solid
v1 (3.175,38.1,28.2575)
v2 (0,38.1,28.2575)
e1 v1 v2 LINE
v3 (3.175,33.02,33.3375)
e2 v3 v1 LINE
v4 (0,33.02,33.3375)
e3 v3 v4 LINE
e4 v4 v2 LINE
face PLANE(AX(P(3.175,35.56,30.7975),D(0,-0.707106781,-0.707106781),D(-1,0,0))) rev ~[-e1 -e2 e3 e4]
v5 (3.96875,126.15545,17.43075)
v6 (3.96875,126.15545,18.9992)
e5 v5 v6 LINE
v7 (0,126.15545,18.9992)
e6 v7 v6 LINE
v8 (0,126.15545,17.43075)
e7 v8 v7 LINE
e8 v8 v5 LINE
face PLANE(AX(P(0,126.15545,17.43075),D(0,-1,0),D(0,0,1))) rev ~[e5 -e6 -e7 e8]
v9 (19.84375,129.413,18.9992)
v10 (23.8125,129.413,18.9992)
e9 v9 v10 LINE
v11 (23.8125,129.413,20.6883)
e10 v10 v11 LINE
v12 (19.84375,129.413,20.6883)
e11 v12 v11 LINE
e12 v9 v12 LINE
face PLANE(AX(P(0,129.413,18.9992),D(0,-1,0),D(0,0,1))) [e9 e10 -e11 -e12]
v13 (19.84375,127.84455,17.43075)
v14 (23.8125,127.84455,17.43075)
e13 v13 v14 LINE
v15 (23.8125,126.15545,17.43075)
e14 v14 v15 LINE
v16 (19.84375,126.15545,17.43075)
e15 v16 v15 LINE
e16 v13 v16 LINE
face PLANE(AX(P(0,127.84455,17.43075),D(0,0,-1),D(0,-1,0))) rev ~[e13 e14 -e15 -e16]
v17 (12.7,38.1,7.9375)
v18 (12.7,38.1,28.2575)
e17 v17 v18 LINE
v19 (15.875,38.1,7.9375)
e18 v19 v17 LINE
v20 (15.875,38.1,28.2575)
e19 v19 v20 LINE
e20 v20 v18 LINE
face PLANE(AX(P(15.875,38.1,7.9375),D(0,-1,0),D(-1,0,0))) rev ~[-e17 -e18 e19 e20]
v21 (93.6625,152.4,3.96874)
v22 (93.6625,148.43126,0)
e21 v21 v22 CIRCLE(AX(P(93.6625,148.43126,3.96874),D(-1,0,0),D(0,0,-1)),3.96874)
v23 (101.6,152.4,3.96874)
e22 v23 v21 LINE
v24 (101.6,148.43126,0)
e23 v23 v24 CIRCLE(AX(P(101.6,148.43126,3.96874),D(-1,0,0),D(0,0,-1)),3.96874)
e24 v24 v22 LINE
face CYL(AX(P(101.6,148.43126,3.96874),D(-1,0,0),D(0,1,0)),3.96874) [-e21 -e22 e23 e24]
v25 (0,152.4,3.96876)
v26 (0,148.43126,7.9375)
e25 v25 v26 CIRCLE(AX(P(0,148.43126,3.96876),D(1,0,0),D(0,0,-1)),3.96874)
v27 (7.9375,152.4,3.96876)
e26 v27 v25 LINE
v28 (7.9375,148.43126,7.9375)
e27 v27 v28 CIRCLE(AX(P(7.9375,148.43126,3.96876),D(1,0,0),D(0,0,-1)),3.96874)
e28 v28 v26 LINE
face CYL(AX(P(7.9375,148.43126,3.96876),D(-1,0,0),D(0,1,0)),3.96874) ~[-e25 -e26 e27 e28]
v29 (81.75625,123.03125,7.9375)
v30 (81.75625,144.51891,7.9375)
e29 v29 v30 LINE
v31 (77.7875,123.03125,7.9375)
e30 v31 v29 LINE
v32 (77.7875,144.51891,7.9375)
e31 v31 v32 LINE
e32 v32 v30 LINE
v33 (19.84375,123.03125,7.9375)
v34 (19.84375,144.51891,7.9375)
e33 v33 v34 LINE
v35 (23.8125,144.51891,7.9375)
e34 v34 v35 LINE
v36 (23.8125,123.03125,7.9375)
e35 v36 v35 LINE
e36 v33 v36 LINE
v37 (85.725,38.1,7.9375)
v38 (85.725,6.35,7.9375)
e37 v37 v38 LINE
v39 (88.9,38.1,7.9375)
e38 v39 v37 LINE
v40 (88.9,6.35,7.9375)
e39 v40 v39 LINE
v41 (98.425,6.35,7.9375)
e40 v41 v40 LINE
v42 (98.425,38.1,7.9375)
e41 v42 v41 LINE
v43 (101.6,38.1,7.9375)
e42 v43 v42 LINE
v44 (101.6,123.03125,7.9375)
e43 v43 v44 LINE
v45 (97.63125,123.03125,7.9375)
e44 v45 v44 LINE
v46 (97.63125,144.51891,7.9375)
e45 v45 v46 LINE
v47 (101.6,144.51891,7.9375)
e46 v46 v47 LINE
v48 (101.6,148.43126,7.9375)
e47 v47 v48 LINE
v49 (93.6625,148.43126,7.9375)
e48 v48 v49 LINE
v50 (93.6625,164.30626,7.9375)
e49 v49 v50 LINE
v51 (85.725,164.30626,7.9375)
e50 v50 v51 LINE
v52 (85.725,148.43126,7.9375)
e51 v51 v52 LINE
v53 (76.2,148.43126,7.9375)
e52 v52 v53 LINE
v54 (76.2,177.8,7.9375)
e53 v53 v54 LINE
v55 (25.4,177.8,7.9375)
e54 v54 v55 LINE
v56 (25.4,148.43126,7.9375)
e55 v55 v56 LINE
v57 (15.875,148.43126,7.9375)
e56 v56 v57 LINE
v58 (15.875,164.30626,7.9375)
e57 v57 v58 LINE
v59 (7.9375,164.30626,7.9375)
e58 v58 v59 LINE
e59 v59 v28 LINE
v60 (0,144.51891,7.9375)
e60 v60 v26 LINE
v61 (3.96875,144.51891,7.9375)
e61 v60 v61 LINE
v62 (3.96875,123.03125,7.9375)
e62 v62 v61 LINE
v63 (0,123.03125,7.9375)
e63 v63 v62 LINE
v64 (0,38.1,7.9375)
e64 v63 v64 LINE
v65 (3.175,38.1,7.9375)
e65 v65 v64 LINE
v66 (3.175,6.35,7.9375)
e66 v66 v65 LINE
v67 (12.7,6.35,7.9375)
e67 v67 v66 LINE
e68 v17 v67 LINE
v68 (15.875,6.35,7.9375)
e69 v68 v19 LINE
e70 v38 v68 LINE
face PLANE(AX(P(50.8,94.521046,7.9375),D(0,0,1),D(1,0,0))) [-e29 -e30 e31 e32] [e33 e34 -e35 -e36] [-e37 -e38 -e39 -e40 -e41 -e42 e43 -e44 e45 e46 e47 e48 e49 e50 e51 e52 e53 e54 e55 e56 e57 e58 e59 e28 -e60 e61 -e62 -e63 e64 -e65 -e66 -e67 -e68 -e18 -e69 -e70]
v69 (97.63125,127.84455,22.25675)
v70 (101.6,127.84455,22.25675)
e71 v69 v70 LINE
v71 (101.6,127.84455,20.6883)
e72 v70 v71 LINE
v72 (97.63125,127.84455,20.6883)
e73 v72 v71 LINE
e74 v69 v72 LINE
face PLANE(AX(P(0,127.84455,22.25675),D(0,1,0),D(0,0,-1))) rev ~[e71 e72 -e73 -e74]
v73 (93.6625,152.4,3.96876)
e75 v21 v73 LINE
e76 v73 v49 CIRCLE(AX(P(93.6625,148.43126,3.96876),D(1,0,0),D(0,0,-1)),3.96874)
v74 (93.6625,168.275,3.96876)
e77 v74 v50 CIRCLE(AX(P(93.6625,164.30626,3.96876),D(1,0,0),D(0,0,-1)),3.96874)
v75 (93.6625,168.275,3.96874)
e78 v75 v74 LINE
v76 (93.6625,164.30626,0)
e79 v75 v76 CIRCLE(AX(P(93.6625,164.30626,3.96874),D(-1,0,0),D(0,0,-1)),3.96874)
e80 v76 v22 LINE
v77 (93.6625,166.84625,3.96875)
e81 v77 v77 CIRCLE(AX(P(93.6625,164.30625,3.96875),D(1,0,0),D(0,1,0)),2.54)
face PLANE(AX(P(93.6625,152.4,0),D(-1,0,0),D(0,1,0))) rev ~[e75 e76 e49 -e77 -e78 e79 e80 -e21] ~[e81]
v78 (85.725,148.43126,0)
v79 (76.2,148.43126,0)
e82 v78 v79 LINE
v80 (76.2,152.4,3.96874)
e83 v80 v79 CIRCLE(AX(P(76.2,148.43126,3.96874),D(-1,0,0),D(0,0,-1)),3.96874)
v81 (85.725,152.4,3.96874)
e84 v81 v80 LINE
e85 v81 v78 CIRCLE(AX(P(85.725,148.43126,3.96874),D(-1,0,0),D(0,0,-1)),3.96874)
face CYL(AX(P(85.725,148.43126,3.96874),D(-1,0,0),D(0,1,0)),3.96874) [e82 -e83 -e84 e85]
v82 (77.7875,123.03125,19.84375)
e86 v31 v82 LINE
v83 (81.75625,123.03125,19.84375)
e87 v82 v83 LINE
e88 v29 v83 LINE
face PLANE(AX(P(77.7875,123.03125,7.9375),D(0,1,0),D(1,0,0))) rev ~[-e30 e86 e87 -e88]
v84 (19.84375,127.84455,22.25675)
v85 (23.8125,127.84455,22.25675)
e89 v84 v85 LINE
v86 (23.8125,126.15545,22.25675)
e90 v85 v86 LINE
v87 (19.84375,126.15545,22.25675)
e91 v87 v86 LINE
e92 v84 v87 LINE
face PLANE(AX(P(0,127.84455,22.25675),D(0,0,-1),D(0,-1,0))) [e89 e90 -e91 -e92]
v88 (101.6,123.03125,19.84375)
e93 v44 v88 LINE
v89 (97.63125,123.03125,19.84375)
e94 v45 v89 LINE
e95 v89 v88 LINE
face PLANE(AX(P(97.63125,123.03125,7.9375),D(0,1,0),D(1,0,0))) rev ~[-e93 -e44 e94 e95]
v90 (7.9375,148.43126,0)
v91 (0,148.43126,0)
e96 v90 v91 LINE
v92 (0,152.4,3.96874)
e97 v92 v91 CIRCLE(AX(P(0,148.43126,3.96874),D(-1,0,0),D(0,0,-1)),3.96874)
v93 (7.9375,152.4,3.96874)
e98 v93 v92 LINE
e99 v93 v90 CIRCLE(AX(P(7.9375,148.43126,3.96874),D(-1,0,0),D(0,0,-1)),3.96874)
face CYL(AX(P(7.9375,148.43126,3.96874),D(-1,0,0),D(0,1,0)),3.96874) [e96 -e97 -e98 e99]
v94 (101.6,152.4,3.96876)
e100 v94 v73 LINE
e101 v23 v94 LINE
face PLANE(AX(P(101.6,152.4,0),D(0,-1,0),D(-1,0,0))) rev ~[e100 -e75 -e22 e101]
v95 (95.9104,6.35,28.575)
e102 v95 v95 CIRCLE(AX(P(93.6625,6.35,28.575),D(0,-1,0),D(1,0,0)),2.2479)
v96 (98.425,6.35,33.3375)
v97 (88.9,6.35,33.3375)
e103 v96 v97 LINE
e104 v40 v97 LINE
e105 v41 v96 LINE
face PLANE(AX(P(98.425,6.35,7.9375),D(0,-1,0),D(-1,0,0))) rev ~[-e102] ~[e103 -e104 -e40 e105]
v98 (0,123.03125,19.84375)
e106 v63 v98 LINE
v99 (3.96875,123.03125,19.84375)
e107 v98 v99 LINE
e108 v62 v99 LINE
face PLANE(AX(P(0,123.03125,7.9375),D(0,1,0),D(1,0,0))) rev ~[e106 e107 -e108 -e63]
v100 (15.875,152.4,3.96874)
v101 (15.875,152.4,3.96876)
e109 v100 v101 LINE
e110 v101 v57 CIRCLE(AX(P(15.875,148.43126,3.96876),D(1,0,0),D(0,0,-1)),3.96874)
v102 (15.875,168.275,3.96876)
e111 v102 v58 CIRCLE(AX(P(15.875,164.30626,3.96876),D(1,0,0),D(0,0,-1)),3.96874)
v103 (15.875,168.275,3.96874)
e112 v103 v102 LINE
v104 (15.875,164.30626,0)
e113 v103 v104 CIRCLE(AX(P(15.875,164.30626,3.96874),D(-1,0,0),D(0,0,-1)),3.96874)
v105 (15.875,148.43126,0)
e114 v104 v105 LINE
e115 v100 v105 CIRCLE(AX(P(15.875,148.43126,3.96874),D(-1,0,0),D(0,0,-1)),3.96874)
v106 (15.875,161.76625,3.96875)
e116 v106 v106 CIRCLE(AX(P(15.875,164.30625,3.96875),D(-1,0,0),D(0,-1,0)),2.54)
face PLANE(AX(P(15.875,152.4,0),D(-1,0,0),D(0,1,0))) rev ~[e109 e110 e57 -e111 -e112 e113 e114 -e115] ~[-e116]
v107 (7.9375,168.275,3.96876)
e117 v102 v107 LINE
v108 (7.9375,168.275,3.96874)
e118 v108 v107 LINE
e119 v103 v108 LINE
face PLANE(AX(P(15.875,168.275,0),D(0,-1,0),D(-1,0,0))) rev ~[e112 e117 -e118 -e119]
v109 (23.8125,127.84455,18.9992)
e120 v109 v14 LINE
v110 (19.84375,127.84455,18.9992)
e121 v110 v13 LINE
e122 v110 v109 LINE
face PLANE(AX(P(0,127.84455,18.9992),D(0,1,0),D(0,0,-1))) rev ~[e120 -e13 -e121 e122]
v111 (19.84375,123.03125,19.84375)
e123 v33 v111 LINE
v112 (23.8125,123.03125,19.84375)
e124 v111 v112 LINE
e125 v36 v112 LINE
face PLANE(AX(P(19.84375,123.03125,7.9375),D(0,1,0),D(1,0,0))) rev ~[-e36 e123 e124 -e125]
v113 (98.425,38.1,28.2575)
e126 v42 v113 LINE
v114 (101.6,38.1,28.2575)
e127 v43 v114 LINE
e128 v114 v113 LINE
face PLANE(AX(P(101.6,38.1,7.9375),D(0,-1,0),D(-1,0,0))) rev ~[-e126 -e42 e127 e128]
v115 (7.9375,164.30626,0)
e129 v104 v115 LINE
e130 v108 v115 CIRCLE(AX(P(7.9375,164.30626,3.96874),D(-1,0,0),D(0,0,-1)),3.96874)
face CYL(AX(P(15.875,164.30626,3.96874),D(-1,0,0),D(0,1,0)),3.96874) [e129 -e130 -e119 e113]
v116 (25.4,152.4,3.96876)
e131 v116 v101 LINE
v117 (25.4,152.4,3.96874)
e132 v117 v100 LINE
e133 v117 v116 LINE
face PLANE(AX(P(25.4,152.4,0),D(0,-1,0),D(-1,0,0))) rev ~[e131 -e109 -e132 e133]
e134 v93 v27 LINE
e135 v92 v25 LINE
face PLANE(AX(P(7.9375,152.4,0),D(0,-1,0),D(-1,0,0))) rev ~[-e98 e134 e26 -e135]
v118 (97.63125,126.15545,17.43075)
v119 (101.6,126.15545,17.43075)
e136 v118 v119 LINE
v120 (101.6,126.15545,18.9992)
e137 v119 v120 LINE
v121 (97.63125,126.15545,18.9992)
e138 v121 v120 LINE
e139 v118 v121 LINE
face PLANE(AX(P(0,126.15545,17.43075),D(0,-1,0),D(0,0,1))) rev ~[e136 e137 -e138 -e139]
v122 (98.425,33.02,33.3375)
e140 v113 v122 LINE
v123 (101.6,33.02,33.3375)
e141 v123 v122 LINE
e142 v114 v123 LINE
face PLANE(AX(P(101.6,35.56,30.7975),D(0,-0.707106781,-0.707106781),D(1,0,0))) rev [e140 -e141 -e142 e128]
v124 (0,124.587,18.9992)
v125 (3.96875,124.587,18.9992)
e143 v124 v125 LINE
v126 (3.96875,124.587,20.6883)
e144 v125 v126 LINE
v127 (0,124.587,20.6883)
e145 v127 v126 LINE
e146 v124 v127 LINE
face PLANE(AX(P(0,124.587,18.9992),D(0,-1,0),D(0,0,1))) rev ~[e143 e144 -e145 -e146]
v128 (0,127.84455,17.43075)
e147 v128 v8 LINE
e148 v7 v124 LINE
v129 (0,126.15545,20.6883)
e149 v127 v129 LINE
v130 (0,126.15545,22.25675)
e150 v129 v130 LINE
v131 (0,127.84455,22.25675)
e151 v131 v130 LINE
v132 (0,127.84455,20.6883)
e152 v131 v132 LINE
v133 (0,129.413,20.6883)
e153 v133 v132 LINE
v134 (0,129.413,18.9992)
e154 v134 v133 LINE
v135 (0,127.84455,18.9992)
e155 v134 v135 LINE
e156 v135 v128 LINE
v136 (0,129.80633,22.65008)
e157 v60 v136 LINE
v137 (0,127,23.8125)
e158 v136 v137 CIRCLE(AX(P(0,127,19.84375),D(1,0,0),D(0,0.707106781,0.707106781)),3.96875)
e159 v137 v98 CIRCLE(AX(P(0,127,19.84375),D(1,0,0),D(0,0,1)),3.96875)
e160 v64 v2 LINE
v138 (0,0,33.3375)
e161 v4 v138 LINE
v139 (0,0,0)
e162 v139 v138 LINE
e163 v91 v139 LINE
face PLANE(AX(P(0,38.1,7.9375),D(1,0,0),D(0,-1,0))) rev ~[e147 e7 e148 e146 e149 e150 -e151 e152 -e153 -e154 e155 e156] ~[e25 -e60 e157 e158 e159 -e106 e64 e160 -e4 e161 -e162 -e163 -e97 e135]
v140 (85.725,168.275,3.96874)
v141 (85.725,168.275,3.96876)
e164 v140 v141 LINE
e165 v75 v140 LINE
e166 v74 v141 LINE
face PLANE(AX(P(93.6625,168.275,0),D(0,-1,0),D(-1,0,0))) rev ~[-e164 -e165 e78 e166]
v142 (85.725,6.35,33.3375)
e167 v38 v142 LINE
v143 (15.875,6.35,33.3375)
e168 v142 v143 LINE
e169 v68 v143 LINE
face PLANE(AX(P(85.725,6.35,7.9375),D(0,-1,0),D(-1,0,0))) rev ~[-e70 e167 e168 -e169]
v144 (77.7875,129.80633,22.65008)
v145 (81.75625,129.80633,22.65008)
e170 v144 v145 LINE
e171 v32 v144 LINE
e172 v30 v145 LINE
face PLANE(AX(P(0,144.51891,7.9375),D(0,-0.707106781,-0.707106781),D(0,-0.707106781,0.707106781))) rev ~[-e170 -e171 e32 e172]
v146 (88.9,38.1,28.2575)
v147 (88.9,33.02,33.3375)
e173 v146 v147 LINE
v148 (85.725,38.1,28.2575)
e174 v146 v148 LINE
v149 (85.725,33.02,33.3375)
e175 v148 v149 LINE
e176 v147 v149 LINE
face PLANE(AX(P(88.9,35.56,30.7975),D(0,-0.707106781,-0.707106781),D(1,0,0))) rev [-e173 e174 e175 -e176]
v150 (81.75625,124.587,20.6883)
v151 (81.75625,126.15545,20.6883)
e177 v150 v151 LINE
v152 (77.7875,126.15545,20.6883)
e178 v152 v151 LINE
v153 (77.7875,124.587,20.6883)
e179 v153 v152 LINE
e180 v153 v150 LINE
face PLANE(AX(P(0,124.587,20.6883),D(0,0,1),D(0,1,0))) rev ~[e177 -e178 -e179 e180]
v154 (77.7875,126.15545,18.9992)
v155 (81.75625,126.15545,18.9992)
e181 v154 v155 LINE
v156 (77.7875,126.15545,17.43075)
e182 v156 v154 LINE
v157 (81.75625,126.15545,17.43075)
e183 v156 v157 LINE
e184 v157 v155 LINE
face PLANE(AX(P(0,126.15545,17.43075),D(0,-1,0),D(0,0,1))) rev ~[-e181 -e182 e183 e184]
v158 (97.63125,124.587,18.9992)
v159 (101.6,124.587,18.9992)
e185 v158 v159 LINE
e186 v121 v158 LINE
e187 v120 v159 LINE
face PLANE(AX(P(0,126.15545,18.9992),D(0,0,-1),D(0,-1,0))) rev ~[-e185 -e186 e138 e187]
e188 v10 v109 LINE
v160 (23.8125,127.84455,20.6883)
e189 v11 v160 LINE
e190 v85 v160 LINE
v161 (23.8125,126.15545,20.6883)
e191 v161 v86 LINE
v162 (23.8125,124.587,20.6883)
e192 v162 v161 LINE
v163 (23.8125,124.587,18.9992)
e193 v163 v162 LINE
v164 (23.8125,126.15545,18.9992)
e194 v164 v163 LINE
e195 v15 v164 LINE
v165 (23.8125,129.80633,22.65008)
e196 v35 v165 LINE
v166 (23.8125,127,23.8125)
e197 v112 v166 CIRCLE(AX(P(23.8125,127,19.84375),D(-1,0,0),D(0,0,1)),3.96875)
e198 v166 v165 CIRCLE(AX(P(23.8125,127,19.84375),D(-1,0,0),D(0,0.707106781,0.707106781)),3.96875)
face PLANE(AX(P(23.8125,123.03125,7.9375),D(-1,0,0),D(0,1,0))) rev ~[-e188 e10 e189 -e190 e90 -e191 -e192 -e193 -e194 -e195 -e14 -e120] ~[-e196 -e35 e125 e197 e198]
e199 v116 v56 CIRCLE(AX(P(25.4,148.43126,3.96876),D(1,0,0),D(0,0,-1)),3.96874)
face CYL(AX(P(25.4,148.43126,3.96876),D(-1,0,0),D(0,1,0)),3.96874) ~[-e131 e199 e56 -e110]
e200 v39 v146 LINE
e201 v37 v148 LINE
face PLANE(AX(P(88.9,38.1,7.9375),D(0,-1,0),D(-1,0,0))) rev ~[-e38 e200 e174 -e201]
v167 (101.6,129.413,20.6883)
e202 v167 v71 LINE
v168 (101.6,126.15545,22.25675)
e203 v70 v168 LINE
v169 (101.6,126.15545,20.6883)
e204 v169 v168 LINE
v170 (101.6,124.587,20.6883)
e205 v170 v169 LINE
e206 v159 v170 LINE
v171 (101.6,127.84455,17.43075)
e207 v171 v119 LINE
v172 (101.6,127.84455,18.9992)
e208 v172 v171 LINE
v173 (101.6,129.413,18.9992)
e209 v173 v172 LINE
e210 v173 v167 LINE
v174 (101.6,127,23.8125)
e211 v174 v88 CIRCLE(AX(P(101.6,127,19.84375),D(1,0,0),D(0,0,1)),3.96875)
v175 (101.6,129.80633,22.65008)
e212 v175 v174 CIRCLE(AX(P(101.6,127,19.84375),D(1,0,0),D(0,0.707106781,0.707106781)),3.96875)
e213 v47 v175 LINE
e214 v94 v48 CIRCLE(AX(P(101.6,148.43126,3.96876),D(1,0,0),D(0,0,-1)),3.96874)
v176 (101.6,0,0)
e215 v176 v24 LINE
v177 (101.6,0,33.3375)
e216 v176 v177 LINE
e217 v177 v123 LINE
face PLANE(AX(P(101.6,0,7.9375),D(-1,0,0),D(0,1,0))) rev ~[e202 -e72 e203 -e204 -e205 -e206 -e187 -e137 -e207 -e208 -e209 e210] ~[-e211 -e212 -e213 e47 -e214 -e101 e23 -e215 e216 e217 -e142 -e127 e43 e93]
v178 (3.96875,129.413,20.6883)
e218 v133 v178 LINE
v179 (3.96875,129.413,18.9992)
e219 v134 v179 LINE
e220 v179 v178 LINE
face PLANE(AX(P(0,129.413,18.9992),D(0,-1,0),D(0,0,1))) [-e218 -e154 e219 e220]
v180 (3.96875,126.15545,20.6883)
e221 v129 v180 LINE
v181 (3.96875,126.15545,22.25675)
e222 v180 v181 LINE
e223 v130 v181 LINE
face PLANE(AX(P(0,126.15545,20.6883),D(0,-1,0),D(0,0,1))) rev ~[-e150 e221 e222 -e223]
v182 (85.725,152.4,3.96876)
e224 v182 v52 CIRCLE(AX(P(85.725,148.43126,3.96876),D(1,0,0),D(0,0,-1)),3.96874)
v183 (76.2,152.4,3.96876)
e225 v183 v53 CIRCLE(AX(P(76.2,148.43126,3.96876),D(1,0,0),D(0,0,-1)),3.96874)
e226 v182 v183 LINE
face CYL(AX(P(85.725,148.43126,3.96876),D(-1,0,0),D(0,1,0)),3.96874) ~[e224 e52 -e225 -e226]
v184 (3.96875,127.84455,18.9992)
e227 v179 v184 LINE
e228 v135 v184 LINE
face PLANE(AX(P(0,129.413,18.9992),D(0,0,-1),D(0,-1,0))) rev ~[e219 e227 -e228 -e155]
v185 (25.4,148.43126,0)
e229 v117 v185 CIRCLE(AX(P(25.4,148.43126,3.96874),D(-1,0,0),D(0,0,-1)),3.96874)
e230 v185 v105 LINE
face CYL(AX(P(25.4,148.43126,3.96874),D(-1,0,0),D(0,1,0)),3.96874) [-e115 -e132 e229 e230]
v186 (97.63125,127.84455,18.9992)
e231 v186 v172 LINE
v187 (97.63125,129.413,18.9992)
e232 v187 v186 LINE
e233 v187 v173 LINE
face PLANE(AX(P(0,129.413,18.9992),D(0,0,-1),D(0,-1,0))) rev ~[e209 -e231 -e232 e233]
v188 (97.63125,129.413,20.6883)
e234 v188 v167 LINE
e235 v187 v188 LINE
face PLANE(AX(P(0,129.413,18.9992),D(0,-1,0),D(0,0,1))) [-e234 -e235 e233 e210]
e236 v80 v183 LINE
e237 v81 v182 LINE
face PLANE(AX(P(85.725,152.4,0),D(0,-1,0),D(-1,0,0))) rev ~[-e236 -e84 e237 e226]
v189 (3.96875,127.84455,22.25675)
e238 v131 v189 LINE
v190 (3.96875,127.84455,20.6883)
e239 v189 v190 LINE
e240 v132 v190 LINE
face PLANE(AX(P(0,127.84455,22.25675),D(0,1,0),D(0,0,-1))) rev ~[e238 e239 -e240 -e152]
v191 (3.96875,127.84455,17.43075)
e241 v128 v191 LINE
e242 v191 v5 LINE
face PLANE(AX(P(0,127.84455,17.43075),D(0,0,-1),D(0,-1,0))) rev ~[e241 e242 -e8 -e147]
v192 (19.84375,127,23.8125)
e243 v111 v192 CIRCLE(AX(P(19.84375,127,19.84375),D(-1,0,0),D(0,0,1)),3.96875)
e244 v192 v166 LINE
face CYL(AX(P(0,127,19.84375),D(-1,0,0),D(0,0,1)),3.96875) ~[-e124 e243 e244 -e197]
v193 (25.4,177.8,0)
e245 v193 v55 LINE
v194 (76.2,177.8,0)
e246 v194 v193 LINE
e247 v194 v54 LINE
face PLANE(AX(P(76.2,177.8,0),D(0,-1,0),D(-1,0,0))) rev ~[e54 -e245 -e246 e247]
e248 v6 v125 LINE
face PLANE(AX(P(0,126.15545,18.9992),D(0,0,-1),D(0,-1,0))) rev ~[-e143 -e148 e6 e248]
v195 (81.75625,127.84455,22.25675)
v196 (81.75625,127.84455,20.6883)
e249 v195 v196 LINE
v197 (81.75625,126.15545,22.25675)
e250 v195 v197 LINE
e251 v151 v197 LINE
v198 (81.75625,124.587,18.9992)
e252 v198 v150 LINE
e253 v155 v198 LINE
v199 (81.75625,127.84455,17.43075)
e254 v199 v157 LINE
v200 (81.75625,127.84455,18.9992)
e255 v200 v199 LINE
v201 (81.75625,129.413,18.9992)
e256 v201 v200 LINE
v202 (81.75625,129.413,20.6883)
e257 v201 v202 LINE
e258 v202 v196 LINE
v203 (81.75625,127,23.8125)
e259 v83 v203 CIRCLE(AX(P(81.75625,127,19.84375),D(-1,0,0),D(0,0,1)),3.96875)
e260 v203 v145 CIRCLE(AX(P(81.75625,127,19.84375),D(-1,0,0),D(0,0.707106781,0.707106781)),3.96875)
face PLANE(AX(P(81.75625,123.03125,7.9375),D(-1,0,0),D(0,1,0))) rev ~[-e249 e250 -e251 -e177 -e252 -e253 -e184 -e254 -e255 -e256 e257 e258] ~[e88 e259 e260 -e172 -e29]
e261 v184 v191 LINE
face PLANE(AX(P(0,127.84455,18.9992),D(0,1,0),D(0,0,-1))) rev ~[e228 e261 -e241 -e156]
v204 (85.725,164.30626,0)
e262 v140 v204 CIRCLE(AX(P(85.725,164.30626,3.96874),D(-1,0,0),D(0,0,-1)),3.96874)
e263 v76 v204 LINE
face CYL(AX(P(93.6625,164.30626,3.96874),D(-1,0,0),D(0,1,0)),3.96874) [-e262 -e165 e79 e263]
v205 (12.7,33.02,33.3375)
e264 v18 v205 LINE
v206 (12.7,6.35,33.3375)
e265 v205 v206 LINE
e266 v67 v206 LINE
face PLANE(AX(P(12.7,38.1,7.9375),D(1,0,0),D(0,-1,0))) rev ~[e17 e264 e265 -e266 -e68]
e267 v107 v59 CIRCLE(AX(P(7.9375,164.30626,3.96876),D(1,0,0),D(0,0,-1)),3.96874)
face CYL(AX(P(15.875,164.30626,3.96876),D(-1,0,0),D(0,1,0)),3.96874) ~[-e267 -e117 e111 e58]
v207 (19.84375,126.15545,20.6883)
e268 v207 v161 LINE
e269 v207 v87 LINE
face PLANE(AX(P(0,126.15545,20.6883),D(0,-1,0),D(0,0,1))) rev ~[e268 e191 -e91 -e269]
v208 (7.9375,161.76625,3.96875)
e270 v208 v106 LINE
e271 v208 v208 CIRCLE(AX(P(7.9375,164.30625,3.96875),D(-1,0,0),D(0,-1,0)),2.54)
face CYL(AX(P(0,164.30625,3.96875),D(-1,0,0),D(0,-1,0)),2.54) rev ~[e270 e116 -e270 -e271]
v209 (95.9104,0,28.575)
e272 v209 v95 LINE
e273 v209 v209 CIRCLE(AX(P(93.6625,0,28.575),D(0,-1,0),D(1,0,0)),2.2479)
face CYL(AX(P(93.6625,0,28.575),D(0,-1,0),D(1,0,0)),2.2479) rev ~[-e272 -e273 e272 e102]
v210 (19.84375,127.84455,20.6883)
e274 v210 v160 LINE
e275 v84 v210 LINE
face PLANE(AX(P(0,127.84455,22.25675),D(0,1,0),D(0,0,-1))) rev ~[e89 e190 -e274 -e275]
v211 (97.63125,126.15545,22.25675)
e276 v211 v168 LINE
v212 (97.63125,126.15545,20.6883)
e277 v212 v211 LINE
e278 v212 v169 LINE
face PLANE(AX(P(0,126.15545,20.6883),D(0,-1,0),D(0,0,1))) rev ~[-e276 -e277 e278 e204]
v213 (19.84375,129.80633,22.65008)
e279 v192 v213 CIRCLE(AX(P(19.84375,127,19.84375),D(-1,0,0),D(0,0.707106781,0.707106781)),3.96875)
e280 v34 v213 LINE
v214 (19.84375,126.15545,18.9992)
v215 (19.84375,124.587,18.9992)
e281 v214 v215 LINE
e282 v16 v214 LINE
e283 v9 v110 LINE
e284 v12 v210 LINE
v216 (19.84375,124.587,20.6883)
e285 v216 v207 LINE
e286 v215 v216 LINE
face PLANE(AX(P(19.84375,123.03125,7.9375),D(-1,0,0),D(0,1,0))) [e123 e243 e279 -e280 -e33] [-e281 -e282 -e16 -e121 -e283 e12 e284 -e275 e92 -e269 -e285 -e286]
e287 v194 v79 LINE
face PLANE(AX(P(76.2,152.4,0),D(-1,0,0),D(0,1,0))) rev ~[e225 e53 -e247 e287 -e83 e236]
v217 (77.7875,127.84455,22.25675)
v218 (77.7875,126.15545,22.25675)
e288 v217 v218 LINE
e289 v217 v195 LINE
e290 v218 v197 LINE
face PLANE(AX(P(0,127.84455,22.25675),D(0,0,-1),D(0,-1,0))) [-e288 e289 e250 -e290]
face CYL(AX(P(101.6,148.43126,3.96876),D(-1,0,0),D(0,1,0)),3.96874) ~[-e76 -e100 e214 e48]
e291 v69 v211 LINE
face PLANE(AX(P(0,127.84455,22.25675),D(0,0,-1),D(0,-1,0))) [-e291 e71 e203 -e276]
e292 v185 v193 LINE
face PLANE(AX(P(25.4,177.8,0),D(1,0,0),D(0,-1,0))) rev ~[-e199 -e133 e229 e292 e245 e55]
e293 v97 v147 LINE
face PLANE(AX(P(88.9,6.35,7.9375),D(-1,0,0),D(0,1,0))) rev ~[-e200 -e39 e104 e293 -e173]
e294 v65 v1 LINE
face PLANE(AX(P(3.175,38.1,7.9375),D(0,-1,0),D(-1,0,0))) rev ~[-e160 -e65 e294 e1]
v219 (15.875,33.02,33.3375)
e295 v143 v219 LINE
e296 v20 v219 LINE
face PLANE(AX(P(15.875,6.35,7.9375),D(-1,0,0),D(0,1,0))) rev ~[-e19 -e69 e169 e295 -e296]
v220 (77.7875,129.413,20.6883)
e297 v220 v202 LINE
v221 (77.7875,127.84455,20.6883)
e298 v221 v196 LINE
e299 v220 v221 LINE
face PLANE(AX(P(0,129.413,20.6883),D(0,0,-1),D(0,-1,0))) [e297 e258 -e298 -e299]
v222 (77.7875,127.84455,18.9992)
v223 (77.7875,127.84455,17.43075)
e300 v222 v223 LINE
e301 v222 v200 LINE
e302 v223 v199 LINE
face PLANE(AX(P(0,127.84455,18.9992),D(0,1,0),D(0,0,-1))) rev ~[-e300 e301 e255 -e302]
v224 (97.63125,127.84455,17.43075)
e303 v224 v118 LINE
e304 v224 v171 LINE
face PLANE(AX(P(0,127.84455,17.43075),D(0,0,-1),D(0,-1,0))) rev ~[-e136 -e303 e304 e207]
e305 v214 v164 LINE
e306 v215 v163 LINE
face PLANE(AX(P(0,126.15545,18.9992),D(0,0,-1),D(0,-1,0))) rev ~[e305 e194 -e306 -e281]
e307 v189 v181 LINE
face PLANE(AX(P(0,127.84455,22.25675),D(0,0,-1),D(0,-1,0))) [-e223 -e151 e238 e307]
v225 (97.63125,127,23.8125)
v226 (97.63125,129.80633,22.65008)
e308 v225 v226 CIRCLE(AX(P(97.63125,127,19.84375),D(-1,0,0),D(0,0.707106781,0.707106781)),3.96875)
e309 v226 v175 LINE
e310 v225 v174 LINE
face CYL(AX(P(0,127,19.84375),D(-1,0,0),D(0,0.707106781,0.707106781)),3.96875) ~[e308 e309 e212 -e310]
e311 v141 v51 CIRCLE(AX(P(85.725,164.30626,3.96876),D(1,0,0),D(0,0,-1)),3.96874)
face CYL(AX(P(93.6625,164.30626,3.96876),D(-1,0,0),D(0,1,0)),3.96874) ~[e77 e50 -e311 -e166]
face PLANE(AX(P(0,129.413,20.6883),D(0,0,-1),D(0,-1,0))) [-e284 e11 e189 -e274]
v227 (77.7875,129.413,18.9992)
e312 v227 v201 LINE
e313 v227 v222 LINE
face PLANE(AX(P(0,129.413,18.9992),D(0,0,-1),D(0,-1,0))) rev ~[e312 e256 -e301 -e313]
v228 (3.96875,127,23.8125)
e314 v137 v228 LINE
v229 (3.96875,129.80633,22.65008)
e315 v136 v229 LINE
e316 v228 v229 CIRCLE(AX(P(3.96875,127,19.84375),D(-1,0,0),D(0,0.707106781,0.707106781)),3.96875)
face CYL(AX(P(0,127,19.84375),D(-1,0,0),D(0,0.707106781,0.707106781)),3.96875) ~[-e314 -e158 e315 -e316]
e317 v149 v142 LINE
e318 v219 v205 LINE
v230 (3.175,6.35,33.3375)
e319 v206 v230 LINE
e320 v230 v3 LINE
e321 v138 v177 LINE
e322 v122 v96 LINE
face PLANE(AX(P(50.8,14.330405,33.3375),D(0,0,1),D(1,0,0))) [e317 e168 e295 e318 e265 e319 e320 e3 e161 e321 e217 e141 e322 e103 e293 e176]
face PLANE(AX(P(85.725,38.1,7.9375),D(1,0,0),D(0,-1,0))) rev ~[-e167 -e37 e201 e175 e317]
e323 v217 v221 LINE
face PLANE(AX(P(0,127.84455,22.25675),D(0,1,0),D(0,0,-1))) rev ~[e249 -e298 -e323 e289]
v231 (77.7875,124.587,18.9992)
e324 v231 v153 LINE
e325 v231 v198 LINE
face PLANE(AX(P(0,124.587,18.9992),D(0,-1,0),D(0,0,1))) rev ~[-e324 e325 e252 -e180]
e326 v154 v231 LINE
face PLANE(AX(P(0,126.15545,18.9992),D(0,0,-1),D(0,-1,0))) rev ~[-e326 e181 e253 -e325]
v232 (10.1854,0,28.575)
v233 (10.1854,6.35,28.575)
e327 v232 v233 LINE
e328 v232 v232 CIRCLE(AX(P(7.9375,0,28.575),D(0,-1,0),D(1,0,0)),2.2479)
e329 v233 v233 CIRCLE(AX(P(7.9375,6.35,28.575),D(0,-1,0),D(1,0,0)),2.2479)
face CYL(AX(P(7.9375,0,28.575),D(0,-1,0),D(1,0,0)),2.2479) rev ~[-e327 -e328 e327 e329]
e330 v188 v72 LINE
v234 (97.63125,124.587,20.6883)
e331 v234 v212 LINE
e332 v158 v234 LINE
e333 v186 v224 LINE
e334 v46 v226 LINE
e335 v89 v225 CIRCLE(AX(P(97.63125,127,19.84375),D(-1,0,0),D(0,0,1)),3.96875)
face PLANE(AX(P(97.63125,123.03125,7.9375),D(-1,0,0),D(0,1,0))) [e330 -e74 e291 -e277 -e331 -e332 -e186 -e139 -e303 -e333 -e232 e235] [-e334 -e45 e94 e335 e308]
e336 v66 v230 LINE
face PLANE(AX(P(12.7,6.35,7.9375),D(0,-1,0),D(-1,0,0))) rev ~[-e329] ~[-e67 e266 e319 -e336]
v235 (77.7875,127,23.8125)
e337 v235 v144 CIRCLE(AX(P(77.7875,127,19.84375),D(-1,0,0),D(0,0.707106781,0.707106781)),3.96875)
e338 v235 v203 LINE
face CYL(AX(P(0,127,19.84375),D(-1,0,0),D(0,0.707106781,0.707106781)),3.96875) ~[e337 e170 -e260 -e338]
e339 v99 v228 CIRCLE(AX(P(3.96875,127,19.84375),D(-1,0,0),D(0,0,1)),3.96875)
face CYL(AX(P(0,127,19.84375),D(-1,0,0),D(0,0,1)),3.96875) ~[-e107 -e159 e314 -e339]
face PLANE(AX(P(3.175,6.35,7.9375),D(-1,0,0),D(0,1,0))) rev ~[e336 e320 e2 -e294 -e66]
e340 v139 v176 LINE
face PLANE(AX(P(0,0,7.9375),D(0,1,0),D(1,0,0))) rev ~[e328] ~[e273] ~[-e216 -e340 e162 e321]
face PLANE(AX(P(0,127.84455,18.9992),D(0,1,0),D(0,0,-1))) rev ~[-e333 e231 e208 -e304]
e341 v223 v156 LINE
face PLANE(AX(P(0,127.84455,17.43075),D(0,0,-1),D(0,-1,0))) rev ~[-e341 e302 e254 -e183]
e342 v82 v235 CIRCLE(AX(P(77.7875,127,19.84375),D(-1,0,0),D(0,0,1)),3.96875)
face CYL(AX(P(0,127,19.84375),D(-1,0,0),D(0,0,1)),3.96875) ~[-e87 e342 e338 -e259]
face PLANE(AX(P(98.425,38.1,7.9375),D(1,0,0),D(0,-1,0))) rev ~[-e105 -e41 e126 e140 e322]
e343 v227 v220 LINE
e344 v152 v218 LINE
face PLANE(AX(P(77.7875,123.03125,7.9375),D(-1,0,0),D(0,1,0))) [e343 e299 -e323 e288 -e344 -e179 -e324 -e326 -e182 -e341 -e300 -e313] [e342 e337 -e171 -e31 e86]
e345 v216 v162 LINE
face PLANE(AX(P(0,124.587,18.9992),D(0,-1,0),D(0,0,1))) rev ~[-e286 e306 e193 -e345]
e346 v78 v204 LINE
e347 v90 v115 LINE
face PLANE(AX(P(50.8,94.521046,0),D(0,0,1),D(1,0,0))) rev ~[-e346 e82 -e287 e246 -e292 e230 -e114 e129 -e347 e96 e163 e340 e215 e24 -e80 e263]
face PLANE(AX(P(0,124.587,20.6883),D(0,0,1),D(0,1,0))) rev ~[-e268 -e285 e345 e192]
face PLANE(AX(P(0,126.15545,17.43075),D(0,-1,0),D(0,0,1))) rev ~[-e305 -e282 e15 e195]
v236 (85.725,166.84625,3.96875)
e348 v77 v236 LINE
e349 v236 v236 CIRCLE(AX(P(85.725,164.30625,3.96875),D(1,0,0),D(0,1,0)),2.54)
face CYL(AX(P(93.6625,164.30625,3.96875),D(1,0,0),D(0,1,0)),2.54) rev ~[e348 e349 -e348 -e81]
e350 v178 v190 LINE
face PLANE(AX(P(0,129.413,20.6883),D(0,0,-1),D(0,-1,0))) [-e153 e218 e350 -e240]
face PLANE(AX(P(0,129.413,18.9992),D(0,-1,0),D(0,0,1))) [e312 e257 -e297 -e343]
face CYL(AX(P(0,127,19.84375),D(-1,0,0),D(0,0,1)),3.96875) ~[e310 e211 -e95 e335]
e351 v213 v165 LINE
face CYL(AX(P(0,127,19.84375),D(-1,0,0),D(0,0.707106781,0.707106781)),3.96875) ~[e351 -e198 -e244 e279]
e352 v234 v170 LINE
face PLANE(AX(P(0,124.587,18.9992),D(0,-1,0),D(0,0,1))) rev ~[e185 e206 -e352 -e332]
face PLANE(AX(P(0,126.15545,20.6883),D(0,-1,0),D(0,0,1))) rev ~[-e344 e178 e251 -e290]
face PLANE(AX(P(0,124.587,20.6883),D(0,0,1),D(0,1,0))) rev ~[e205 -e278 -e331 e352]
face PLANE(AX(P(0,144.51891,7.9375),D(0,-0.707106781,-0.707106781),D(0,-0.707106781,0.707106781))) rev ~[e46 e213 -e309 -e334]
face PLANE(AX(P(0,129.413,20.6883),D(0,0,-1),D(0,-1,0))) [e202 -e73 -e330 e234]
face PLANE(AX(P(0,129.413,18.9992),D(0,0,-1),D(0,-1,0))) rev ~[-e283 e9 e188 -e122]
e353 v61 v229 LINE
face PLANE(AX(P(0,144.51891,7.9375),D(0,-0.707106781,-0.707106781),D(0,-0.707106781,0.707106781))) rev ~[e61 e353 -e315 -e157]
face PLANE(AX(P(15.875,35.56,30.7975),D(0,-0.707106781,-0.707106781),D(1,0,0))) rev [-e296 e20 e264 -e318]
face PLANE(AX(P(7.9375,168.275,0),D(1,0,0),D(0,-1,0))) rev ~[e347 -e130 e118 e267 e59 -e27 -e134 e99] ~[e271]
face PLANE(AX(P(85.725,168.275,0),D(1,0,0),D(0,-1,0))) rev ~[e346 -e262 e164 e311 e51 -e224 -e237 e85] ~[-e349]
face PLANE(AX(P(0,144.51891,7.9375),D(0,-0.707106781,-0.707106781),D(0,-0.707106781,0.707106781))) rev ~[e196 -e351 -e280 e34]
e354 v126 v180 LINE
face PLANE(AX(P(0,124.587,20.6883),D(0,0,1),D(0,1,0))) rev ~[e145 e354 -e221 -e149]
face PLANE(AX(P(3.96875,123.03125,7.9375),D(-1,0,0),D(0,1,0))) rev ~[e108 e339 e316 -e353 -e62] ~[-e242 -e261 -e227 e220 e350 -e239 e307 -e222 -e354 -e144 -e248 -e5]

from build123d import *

# Parameters (mm, degrees)
F1_DEPTH  = 7.9375
F2_R      = 3.96874
F3_R      = 2.54
F4_DEPTH  = 25.4
F5_R      = 2.54
F6_DEPTH  = 7.9375
F7_W      = 3.96875
F7_H      = 25.4
F8_DEPTH  = 15.875
F9_W      = 1.6891
F9_H      = 1.56845
F9_H_2    = 1.6891
F9_W_2    = 1.56845
F10_DEPTH = 101.6
F12_DEPTH = 25.4
F13_SIZE  = 5.08
F14_R     = 2.2479
F15_DEPTH = 6.35


# Not quite as in the source:
# - a fillet or chamfer is up to 0.001 mm smaller than in the source, because OpenCascade refuses the exact size
# - an extrude ends at something that could not be found from the text; its depth is read off the source's solid


with BuildPart() as f1:
    # F0 (on Top) → F1 (new body)
    with BuildSketch(Plane.XY):
        Polygon((0, 152.4), (0, 0), (101.6, 0), (101.6, 152.4), (93.6625, 152.4), (93.6625, 168.275), (85.725, 168.275), (85.725, 152.4), (76.2, 152.4), (76.2, 177.8), (25.4, 177.8), (25.4, 152.4), (15.875, 152.4), (15.875, 168.275), (7.9375, 168.275), (7.9375, 152.4), align=None)
    extrude(amount=F1_DEPTH)

    # F2 (radius 3.96875 in the source; OpenCascade refuses exactly that, so slightly less here)
    f2_edges = [f1.edges().sort_by_distance(p)[0] for p in [
        (20.6375, 152.4, 0),
        (20.6375, 152.4, 7.9375),
        (11.90625, 168.275, 0),
        (11.90625, 168.275, 7.9375),
        (3.96875, 152.4, 0),
        (3.96875, 152.4, 7.9375),
        (80.9625, 152.4, 7.9375),
        (80.9625, 152.4, 0),
        (97.63125, 152.4, 0),
        (97.63125, 152.4, 7.9375),
        (89.69375, 168.275, 7.9375),
        (89.69375, 168.275, 0),
    ]]
    fillet(f2_edges, radius=F2_R)

    # F3 (on face) → F4 (cut, through all)
    with BuildSketch(Plane(origin=(0, 0, 0), x_dir=(0, -1, 0), z_dir=(-1, 0, 0))):
        with Locations((-164.30625, 3.96875)):
            Circle(F3_R)
    extrude(amount=-F4_DEPTH, mode=Mode.SUBTRACT)

    # F5 (on face) → F6 (cut, through all)
    with BuildSketch(Plane.YZ.offset(93.6625)):
        with Locations((164.30625, 3.96875)):
            Circle(F5_R)
    extrude(amount=-F6_DEPTH, mode=Mode.SUBTRACT)

    # F7 (on face) → F8 (join)
    with BuildSketch(Plane.XY.offset(7.9375)):
        with Locations((1.984375, 135.73125)):
            Rectangle(F7_W, F7_H)
        with Locations((21.828125, 135.73125)):
            Rectangle(F7_W, F7_H)
        with Locations((99.615625, 135.73125)):
            Rectangle(F7_W, F7_H)
        with Locations((79.771875, 135.73125)):
            Rectangle(F7_W, F7_H)
    extrude(amount=F8_DEPTH)

    # F9 (on face) → F10 (cut, through all)
    with BuildSketch(Plane(origin=(0, 0, 0), x_dir=(0, -1, 0), z_dir=(-1, 0, 0))):
        with BuildLine():
            Line((-123.03125, 19.84375), (-123.03125, 23.8125))
            Line((-123.03125, 23.8125), (-127, 23.8125))
            ThreePointArc((-127, 23.8125), (-124.1936699622, 22.6500800378), (-123.03125, 19.84375))
        make_face()
        with BuildLine():
            ThreePointArc((-129.8063300378, 22.6500800378), (-128.5187748722, 23.5103968947), (-127, 23.8125))
            Line((-127, 23.8125), (-148.43125, 23.8125))
            Line((-148.43125, 23.8125), (-148.43125, 7.9375))
            Line((-148.43125, 7.9375), (-144.5189100757, 7.9375))
            Line((-144.5189100757, 7.9375), (-129.8063300378, 22.6500800378))
        make_face()
        with Locations((-127, 18.214975)):
            Rectangle(F9_W, F9_H)
        with Locations((-127, 19.84375)):
            Rectangle(F9_W, F9_H_2)
        with Locations((-125.371225, 19.84375)):
            Rectangle(F9_W_2, F9_H_2)
        with Locations((-127, 21.472525)):
            Rectangle(F9_W, F9_H)
        with Locations((-128.628775, 19.84375)):
            Rectangle(F9_W_2, F9_H_2)
    extrude(amount=-F10_DEPTH, mode=Mode.SUBTRACT)

    # F11 (on face) → F12 (join)
    with BuildSketch(Plane.XY.offset(7.9375)):
        Polygon((0, 38.1), (0, 0), (101.6, 0), (101.6, 38.1), (98.425, 38.1), (98.425, 6.35), (88.9, 6.35), (88.9, 38.1), (85.725, 38.1), (85.725, 6.35), (15.875, 6.35), (15.875, 38.1), (12.7, 38.1), (12.7, 6.35), (3.175, 6.35), (3.175, 38.1), align=None)
    extrude(amount=F12_DEPTH)

    # F13
    f13_edges = [f1.edges().sort_by_distance(p)[0] for p in [
        (14.2875, 38.1, 33.3375),
        (1.5875, 38.1, 33.3375),
        (87.3125, 38.1, 33.3375),
        (100.0125, 38.1, 33.3375),
    ]]
    chamfer(f13_edges, length=F13_SIZE)

    # F14 (on face) → F15 (cut, through all)
    with BuildSketch(Plane.XZ):
        with Locations((93.6625, 28.575)):
            Circle(F14_R)
        with Locations((7.9375, 28.575)):
            Circle(F14_R)
    extrude(amount=-F15_DEPTH, mode=Mode.SUBTRACT)


solid = f1.part
